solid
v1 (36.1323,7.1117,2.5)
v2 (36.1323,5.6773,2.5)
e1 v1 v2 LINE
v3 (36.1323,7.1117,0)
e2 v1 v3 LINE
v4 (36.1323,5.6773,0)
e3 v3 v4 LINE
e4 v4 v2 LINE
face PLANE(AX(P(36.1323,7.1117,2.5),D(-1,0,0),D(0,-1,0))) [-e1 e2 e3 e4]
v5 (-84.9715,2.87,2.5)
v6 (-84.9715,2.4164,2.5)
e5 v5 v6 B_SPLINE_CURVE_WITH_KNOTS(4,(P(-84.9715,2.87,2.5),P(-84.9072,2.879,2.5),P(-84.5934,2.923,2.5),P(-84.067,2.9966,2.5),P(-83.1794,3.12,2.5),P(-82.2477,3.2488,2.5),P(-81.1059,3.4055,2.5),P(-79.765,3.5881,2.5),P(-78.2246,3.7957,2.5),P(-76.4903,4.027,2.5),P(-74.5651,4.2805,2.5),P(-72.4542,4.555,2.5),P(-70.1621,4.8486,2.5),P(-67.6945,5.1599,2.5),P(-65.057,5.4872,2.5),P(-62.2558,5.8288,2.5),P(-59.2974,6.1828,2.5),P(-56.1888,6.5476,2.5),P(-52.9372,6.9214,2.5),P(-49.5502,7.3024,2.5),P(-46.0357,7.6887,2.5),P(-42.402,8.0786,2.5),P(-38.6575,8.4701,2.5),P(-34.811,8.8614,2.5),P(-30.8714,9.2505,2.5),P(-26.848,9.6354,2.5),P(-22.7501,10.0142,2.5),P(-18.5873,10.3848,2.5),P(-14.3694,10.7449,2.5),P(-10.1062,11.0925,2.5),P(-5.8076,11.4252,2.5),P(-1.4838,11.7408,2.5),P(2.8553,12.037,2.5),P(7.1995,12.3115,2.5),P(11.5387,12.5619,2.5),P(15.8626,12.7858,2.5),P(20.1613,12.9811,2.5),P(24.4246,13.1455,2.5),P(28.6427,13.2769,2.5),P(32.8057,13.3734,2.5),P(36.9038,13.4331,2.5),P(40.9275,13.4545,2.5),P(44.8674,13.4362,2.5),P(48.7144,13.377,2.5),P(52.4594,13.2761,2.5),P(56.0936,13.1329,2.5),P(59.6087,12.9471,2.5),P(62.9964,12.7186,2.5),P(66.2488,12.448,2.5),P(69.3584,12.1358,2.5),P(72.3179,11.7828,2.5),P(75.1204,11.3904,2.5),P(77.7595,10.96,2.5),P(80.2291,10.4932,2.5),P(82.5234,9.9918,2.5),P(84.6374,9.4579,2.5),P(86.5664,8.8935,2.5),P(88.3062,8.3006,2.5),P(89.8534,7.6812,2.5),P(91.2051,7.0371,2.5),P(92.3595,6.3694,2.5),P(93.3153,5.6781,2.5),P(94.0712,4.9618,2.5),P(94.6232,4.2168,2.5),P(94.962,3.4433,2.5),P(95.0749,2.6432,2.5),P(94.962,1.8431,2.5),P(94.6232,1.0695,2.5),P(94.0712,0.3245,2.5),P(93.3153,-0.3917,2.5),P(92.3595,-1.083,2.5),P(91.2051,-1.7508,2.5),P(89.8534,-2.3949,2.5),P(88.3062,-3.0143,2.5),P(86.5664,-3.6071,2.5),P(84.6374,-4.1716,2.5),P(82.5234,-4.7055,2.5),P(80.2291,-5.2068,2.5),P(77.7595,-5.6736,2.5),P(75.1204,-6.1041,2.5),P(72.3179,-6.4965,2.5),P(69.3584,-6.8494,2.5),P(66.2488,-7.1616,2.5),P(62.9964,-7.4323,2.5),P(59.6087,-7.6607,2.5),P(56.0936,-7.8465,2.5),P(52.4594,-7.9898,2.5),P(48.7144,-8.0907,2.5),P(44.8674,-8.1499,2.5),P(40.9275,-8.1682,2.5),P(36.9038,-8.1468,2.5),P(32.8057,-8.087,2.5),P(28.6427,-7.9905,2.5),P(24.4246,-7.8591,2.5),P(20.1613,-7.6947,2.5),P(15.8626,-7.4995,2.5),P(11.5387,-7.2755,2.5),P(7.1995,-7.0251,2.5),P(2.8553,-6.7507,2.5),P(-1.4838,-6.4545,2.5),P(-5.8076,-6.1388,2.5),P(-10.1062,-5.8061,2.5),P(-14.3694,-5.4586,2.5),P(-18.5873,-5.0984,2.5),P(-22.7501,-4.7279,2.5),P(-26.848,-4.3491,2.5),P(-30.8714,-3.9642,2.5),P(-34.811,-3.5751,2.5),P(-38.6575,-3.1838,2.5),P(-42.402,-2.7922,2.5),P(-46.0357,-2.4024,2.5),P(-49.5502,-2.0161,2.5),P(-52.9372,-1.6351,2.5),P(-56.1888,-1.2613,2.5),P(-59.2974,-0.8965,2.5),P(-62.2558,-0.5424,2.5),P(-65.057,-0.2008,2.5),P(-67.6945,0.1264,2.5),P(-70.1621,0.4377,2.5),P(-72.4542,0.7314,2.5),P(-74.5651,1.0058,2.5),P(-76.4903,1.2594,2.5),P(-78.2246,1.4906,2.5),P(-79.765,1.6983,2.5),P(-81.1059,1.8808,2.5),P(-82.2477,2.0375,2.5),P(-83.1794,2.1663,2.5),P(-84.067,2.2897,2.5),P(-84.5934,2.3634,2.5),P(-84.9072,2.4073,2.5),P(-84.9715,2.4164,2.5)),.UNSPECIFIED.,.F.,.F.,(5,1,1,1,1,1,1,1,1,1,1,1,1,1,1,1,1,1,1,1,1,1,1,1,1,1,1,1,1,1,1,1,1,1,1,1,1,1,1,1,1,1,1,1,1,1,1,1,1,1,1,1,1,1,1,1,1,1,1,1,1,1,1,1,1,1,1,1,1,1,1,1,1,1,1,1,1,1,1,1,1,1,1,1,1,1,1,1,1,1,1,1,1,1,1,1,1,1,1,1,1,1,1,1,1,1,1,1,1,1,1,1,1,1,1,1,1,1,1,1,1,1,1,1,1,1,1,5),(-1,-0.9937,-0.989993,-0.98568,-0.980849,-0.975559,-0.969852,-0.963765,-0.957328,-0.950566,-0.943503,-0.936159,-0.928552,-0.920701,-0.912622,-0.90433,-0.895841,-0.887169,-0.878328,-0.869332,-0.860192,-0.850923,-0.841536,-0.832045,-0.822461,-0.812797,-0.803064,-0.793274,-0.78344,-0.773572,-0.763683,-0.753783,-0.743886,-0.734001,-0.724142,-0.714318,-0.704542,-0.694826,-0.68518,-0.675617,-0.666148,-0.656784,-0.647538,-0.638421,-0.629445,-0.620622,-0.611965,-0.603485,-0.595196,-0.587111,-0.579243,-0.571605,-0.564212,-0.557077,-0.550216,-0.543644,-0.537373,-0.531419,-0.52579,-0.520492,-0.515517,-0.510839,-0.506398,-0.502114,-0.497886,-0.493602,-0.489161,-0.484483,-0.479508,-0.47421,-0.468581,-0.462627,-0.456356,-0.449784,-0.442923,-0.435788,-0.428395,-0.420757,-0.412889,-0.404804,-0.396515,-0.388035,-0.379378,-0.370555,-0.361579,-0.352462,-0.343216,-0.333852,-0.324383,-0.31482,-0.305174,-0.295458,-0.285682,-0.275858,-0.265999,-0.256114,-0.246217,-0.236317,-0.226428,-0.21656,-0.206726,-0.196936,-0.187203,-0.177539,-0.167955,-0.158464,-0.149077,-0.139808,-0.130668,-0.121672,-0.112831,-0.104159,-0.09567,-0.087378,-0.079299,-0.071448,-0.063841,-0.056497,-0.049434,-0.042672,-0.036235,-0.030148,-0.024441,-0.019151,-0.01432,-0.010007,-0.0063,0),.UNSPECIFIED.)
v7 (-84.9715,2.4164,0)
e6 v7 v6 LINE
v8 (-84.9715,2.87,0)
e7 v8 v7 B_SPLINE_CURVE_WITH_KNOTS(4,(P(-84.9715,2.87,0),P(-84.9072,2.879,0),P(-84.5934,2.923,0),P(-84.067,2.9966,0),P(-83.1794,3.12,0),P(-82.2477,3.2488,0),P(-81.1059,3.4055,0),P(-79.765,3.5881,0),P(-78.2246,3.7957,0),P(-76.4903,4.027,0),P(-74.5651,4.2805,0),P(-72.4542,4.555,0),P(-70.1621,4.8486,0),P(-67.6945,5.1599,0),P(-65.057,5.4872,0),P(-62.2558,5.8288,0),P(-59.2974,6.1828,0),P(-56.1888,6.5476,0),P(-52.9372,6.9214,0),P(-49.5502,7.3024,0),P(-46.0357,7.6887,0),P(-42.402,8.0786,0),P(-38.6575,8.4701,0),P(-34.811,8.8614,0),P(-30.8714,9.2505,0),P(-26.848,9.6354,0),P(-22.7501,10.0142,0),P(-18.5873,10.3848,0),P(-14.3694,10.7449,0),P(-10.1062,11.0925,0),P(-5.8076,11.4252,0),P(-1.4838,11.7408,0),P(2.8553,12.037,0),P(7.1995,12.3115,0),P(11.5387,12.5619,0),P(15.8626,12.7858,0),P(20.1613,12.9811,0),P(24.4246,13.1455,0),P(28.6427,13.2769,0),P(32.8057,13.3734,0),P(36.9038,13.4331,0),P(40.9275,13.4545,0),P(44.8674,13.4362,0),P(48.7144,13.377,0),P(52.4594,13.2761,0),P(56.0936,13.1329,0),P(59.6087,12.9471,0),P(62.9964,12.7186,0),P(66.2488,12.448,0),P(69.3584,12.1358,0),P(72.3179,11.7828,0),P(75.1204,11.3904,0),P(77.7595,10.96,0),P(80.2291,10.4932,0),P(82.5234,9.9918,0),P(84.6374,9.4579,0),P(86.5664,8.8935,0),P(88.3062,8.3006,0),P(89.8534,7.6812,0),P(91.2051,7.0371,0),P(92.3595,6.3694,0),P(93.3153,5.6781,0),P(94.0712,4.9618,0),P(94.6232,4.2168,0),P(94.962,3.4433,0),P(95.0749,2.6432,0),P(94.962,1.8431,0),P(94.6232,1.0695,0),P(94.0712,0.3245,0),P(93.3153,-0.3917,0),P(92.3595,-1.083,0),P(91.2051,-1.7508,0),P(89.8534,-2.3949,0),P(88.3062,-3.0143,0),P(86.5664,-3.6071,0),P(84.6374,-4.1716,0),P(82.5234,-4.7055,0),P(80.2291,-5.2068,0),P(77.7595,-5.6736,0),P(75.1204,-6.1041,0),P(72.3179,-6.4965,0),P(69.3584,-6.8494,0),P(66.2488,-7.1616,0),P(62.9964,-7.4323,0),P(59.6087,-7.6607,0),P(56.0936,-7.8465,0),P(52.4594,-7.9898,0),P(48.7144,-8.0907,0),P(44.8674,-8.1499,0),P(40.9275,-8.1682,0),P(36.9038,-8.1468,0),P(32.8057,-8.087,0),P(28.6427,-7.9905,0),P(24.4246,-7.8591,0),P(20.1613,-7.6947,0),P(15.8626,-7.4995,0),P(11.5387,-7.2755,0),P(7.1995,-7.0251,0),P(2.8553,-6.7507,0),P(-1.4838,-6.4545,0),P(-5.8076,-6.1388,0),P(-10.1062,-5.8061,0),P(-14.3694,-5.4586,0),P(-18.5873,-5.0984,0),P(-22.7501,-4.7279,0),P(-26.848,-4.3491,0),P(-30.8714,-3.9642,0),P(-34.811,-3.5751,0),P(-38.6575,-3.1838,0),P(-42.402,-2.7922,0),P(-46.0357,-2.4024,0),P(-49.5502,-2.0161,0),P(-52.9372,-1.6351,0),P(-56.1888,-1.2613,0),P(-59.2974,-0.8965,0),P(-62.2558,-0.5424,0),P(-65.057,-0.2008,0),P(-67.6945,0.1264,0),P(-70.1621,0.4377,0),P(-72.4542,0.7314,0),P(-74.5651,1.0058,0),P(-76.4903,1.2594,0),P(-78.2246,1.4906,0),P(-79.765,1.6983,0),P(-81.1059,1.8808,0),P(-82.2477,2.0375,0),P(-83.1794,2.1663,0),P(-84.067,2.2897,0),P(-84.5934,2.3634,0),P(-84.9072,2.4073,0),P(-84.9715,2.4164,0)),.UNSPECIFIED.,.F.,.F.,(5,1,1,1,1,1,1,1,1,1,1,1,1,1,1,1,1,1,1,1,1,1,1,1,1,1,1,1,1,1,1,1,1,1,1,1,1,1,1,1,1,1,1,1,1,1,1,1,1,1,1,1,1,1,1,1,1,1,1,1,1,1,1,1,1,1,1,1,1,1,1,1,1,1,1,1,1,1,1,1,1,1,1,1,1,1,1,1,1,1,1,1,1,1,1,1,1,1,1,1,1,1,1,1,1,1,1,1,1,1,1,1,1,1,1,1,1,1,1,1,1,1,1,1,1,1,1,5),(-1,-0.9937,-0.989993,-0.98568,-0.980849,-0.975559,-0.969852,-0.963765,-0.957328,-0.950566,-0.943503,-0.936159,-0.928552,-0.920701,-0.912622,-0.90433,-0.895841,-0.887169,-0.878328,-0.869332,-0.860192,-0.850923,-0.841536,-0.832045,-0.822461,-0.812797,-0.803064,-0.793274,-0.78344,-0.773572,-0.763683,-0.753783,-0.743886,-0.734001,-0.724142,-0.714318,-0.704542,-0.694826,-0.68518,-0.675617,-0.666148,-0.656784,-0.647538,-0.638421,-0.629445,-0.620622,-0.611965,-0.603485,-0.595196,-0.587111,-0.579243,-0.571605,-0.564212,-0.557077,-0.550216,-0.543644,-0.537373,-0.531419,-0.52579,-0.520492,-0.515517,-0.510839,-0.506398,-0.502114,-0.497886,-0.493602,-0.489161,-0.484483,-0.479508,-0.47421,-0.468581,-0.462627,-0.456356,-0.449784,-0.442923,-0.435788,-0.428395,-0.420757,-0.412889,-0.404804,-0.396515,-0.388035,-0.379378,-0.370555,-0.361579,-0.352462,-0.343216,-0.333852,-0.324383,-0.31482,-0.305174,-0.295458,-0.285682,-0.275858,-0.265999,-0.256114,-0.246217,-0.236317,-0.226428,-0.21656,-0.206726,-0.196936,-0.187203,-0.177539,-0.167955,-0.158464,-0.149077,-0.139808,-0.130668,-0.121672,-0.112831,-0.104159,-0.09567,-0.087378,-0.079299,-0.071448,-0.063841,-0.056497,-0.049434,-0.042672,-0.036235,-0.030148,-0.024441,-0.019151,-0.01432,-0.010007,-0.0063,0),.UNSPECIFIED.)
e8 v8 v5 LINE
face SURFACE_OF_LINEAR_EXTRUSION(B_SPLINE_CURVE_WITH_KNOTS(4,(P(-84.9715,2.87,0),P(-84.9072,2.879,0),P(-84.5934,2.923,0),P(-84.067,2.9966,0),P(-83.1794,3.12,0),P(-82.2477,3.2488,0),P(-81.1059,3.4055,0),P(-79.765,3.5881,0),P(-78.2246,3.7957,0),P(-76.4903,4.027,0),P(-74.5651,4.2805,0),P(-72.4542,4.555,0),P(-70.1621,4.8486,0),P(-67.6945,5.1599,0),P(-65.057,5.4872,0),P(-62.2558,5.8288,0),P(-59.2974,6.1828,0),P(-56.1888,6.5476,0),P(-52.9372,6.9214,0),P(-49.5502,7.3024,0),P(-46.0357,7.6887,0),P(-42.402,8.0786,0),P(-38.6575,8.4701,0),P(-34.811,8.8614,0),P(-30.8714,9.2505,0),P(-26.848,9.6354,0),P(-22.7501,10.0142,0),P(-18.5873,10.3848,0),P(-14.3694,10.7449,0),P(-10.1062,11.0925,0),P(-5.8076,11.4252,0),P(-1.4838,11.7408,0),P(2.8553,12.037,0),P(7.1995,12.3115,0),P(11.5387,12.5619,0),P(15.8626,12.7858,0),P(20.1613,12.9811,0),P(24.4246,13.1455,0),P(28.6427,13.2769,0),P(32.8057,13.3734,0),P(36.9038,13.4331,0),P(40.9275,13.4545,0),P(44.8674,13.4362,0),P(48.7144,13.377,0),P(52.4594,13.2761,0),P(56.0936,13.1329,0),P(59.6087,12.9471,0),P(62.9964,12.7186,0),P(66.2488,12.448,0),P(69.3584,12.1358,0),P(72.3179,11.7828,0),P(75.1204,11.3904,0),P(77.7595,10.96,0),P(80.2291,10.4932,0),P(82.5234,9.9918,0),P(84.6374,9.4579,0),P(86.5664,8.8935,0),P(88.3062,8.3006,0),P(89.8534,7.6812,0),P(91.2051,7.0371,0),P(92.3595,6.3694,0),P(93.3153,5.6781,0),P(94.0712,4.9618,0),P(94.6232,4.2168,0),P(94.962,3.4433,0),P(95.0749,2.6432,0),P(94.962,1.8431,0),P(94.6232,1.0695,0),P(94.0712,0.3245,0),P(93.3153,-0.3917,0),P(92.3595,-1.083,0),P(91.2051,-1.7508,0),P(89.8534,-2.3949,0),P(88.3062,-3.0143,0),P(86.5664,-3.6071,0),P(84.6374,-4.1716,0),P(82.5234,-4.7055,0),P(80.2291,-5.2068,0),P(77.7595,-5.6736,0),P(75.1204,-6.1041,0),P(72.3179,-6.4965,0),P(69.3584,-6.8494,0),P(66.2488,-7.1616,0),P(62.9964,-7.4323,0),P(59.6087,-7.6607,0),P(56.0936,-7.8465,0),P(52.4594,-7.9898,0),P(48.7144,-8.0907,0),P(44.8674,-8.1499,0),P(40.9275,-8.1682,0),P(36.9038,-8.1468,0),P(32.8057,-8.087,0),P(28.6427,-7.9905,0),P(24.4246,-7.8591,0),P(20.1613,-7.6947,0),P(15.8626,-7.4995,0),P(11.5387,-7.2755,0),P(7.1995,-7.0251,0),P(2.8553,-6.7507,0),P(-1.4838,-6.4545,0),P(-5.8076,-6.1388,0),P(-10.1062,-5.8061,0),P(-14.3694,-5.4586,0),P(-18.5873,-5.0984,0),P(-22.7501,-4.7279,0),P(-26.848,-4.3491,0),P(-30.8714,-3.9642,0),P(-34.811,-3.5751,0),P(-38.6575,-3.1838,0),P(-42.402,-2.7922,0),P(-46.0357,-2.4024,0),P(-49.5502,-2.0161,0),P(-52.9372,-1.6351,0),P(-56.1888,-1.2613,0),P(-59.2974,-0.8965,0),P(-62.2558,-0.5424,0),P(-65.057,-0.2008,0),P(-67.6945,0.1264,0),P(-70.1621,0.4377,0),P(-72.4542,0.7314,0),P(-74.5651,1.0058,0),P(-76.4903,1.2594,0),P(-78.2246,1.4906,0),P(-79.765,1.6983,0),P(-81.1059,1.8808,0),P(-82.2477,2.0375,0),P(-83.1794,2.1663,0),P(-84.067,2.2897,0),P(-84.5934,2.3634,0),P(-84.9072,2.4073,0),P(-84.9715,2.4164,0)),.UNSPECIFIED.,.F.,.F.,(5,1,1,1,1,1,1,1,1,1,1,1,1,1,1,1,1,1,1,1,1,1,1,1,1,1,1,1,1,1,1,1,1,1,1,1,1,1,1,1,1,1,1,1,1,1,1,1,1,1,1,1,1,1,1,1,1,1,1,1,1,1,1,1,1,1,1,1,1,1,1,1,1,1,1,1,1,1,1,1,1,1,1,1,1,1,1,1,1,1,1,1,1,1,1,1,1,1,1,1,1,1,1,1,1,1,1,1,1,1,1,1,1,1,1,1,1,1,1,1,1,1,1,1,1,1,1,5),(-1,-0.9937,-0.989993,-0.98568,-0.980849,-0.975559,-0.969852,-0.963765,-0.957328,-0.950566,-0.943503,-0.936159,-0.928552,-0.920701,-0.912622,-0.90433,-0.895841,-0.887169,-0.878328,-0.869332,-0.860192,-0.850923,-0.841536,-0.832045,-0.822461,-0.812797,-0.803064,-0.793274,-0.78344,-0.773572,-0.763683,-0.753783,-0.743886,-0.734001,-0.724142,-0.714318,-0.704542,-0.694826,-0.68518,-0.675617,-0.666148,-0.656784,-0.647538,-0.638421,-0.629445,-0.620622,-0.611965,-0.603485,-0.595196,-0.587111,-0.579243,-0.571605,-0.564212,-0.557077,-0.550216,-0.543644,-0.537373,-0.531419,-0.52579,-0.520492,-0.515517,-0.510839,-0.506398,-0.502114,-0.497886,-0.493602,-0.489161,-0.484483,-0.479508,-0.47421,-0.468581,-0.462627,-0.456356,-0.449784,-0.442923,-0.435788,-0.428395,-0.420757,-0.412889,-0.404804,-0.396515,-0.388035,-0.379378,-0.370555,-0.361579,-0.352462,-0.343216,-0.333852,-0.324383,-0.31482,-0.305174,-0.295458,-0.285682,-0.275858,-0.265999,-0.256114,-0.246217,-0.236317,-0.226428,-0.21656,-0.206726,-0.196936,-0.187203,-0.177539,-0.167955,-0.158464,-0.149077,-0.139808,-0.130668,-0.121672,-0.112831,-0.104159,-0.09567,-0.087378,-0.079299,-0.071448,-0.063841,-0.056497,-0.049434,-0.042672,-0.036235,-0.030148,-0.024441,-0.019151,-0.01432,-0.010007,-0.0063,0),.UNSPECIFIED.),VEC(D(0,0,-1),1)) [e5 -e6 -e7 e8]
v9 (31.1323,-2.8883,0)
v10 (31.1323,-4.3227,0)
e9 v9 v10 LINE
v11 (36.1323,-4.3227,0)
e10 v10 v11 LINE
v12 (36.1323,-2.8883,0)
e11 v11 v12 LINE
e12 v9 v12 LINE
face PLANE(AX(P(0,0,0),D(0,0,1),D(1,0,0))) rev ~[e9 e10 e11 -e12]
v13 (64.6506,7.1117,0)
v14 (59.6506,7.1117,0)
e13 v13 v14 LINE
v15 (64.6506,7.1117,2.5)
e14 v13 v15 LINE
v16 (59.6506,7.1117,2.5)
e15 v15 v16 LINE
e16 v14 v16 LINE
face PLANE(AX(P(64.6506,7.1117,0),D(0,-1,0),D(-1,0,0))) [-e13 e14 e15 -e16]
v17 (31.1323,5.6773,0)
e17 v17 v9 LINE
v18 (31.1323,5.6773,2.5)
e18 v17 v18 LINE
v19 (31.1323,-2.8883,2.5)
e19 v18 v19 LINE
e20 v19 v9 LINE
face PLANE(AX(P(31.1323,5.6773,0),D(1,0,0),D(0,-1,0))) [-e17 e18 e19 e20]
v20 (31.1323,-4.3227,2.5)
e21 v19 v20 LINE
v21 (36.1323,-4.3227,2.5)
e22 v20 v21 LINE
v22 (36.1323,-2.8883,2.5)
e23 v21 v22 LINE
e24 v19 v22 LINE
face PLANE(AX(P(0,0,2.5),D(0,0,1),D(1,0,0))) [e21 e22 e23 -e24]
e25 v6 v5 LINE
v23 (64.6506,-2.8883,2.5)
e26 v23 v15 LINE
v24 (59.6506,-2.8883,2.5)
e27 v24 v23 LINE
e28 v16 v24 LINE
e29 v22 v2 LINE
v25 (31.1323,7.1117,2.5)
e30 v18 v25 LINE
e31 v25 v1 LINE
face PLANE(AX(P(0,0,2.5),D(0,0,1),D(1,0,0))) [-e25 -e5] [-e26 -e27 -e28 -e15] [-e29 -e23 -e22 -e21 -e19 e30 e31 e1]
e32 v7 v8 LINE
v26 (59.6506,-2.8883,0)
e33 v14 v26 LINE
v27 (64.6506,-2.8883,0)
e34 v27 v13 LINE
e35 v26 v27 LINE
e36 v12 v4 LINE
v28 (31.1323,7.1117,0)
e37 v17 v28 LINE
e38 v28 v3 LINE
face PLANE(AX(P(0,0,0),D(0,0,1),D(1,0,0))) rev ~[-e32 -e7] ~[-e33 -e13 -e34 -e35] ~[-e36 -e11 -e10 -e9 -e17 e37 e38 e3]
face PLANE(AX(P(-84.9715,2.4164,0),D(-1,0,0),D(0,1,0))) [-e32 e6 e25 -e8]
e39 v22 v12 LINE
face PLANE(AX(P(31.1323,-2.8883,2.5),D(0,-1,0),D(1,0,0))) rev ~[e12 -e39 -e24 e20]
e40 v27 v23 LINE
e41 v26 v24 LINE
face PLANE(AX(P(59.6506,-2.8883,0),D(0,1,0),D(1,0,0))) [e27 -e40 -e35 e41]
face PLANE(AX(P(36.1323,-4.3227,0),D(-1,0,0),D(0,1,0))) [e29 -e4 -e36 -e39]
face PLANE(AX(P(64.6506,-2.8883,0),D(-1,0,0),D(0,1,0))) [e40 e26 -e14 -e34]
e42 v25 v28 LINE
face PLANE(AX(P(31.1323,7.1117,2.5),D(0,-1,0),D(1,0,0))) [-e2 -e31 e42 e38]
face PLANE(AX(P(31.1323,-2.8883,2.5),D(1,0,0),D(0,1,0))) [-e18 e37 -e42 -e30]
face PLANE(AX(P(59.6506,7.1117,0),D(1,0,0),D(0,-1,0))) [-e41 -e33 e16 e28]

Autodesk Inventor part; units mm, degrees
ref_plane "YZ Plane" through (0, 0, 0) normal (1, 0, 0) x (0, 1, 0)
ref_plane "XZ Plane" through (0, 0, 0) normal (0, 1, 0) x (-1, 0, 0)
ref_plane "XY Plane" through (0, 0, 0) normal (0, 0, 1) x (1, 0, 0)
sketch "Sketch1" plane through (0, 0, 0) normal (0, 0, 1) x (1, 0, 0)
  line L0 (64.6506, 7.1117) -> (59.6506, 7.1117)
  line L1 (59.6506, 7.1117) -> (59.6506, -2.8883)
  line L2 (64.6506, -2.8883) -> (64.6506, 7.1117)
  line L3 (59.6506, -2.8883) -> (64.6506, -2.8883)
  line L4 (36.1323, 5.6773) -> (31.1323, 5.6773)
  line L5 (36.1323, -4.3227) -> (36.1323, 5.6773)
  line L6 (31.1323, 5.6773) -> (31.1323, -4.3227)
  line L7 (31.1323, -4.3227) -> (36.1323, -4.3227)
  line L8 (-84.9715, 2.4164) -> (-84.9715, 2.87)
  spline S0 degree 4 poles (-84.9715, 2.87) (-84.9072, 2.879) (-84.5934, 2.923) (-84.067, 2.9966) (-83.1794, 3.12) (-82.2477, 3.2488) (-81.1059, 3.4055) (-79.765, 3.5881) (-78.2246, 3.7957) (-76.4903, 4.027) (-74.5651, 4.2805) (-72.4542, 4.555) (-70.1621, 4.8486) (-67.6945, 5.1599) (-65.057, 5.4872) (-62.2558, 5.8288) (-59.2974, 6.1828) (-56.1888, 6.5476) (-52.9372, 6.9214) (-49.5502, 7.3024) (-46.0357, 7.6887) (-42.402, 8.0786) (-38.6575, 8.4701) (-34.811, 8.8614) (-30.8714, 9.2505) (-26.848, 9.6354) (-22.7501, 10.0142) (-18.5873, 10.3848) (-14.3694, 10.7449) (-10.1062, 11.0925) (-5.8076, 11.4252) (-1.4838, 11.7408) (2.8553, 12.037) (7.1995, 12.3115) (11.5387, 12.5619) (15.8626, 12.7858) (20.1613, 12.9811) (24.4246, 13.1455) (28.6427, 13.2769) (32.8057, 13.3734) (36.9038, 13.4331) (40.9275, 13.4545) (44.8674, 13.4362) (48.7144, 13.377) (52.4594, 13.2761) (56.0936, 13.1329) (59.6087, 12.9471) (62.9964, 12.7186) (66.2488, 12.448) (69.3584, 12.1358) (72.3179, 11.7828) (75.1204, 11.3904) (77.7595, 10.96) (80.2291, 10.4932) (82.5234, 9.9918) (84.6374, 9.4579) (86.5664, 8.8935) (88.3062, 8.3006) (89.8534, 7.6812) (91.2051, 7.0371) (92.3595, 6.3694) (93.3153, 5.6781) (94.0712, 4.9618) (94.6232, 4.2168) (94.962, 3.4433) (95.0749, 2.6432) (94.962, 1.8431) (94.6232, 1.0695) (94.0712, 0.3245) (93.3153, -0.3917) (92.3595, -1.083) (91.2051, -1.7508) (89.8534, -2.3949) (88.3062, -3.0143) (86.5664, -3.6071) (84.6374, -4.1716) (82.5234, -4.7055) (80.2291, -5.2068) (77.7595, -5.6736) (75.1204, -6.1041) (72.3179, -6.4965) (69.3584, -6.8494) (66.2488, -7.1616) (62.9964, -7.4323) (59.6087, -7.6607) (56.0936, -7.8465) (52.4594, -7.9898) (48.7144, -8.0907) (44.8674, -8.1499) (40.9275, -8.1682) (36.9038, -8.1468) (32.8057, -8.087) (28.6427, -7.9905) (24.4246, -7.8591) (20.1613, -7.6947) (15.8626, -7.4995) (11.5387, -7.2755) (7.1995, -7.0251) (2.8553, -6.7507) (-1.4838, -6.4545) (-5.8076, -6.1388) (-10.1062, -5.8061) (-14.3694, -5.4586) (-18.5873, -5.0984) (-22.7501, -4.7279) (-26.848, -4.3491) (-30.8714, -3.9642) (-34.811, -3.5751) (-38.6575, -3.1838) (-42.402, -2.7922) (-46.0357, -2.4024) (-49.5502, -2.0161) (-52.9372, -1.6351) (-56.1888, -1.2613) (-59.2974, -0.8965) (-62.2558, -0.5424) (-65.057, -0.2008) (-67.6945, 0.1264) (-70.1621, 0.4377) (-72.4542, 0.7314) (-74.5651, 1.0058) (-76.4903, 1.2594) (-78.2246, 1.4906) (-79.765, 1.6983) (-81.1059, 1.8808) (-82.2477, 2.0375) (-83.1794, 2.1663) (-84.067, 2.2897) (-84.5934, 2.3634) (-84.9072, 2.4073) (-84.9715, 2.4164) knots -1 -1 -1 -1 -1 -0.9937 -0.989993 -0.98568 -0.980849 -0.975559 -0.969852 -0.963765 -0.957328 -0.950566 -0.943503 -0.936159 -0.928552 -0.920701 -0.912622 -0.90433 -0.895841 -0.887169 -0.878328 -0.869332 -0.860192 -0.850923 -0.841536 -0.832045 -0.822461 -0.812797 -0.803064 -0.793274 -0.78344 -0.773572 -0.763683 -0.753783 -0.743886 -0.734001 -0.724142 -0.714318 -0.704542 -0.694826 -0.68518 -0.675617 -0.666148 -0.656784 -0.647538 -0.638421 -0.629445 -0.620622 -0.611965 -0.603485 -0.595196 -0.587111 -0.579243 -0.571605 -0.564212 -0.557077 -0.550216 -0.543644 -0.537373 -0.531419 -0.52579 -0.520492 -0.515517 -0.510839 -0.506398 -0.502114 -0.497886 -0.493602 -0.489161 -0.484483 -0.479508 -0.47421 -0.468581 -0.462627 -0.456356 -0.449784 -0.442923 -0.435788 -0.428395 -0.420757 -0.412889 -0.404804 -0.396515 -0.388035 -0.379378 -0.370555 -0.361579 -0.352462 -0.343216 -0.333852 -0.324383 -0.31482 -0.305174 -0.295458 -0.285682 -0.275858 -0.265999 -0.256114 -0.246217 -0.236317 -0.226428 -0.21656 -0.206726 -0.196936 -0.187203 -0.177539 -0.167955 -0.158464 -0.149077 -0.139808 -0.130668 -0.121672 -0.112831 -0.104159 -0.09567 -0.087378 -0.079299 -0.071448 -0.063841 -0.056497 -0.049434 -0.042672 -0.036235 -0.030148 -0.024441 -0.019151 -0.01432 -0.010007 -0.0063 0 0 0 0 0
  point P0 (0, 0)
extrude "Extrusion1" add sketch "Sketch1" along normal blind 2.5
sketch "Sketch3" plane through (0, 0, 2.5) normal (0, 0, 1) x (1, 0, 0)
  line L0 (59.6506, 7.1117) -> (64.6506, 7.1117) projected
  line L1 (59.6506, 7.1117) -> (64.6506, 7.1117) projected
  line L2 (64.6506, 7.1117) -> (64.6506, -2.8883) projected
  line L3 (64.6506, 7.1117) -> (64.6506, -2.8883) projected
  line L4 (59.6506, -2.8883) -> (59.6506, 7.1117) projected
  line L5 (59.6506, -2.8883) -> (59.6506, 7.1117) projected
  line L6 (64.6506, -2.8883) -> (59.6506, -2.8883) projected
  line L7 (64.6506, -2.8883) -> (59.6506, -2.8883) projected
  line L8 (31.1323, 7.1117) -> (36.1323, 7.1117)
  line L9 (36.1323, 7.1117) -> (36.1323, -2.8883)
  line L10 (36.1323, -2.8883) -> (31.1323, -2.8883)
  line L11 (31.1323, -2.8883) -> (31.1323, 7.1117)
  point P0 (0, 0)
extrude "Extrusion2" cut sketch "Sketch3" against normal blind 10 contours L8 L9 L10 L11
sketch "Sketch4" plane through (0, 0, 2.5) normal (0, 0, 1) x (1, 0, 0)
  line L0 (31.1323, -2.8883) -> (36.1323, -2.8883)
  line L1 (36.1323, -2.8883) -> (36.1323, -4.3227)
  line L2 (36.1323, -4.3227) -> (31.1323, -4.3227)
  line L3 (31.1323, -4.3227) -> (31.1323, -2.8883)
  point P0 (0, 0)
extrude "Extrusion3" add sketch "Sketch4" against normal blind 2.5
properties part number "back side foil"
